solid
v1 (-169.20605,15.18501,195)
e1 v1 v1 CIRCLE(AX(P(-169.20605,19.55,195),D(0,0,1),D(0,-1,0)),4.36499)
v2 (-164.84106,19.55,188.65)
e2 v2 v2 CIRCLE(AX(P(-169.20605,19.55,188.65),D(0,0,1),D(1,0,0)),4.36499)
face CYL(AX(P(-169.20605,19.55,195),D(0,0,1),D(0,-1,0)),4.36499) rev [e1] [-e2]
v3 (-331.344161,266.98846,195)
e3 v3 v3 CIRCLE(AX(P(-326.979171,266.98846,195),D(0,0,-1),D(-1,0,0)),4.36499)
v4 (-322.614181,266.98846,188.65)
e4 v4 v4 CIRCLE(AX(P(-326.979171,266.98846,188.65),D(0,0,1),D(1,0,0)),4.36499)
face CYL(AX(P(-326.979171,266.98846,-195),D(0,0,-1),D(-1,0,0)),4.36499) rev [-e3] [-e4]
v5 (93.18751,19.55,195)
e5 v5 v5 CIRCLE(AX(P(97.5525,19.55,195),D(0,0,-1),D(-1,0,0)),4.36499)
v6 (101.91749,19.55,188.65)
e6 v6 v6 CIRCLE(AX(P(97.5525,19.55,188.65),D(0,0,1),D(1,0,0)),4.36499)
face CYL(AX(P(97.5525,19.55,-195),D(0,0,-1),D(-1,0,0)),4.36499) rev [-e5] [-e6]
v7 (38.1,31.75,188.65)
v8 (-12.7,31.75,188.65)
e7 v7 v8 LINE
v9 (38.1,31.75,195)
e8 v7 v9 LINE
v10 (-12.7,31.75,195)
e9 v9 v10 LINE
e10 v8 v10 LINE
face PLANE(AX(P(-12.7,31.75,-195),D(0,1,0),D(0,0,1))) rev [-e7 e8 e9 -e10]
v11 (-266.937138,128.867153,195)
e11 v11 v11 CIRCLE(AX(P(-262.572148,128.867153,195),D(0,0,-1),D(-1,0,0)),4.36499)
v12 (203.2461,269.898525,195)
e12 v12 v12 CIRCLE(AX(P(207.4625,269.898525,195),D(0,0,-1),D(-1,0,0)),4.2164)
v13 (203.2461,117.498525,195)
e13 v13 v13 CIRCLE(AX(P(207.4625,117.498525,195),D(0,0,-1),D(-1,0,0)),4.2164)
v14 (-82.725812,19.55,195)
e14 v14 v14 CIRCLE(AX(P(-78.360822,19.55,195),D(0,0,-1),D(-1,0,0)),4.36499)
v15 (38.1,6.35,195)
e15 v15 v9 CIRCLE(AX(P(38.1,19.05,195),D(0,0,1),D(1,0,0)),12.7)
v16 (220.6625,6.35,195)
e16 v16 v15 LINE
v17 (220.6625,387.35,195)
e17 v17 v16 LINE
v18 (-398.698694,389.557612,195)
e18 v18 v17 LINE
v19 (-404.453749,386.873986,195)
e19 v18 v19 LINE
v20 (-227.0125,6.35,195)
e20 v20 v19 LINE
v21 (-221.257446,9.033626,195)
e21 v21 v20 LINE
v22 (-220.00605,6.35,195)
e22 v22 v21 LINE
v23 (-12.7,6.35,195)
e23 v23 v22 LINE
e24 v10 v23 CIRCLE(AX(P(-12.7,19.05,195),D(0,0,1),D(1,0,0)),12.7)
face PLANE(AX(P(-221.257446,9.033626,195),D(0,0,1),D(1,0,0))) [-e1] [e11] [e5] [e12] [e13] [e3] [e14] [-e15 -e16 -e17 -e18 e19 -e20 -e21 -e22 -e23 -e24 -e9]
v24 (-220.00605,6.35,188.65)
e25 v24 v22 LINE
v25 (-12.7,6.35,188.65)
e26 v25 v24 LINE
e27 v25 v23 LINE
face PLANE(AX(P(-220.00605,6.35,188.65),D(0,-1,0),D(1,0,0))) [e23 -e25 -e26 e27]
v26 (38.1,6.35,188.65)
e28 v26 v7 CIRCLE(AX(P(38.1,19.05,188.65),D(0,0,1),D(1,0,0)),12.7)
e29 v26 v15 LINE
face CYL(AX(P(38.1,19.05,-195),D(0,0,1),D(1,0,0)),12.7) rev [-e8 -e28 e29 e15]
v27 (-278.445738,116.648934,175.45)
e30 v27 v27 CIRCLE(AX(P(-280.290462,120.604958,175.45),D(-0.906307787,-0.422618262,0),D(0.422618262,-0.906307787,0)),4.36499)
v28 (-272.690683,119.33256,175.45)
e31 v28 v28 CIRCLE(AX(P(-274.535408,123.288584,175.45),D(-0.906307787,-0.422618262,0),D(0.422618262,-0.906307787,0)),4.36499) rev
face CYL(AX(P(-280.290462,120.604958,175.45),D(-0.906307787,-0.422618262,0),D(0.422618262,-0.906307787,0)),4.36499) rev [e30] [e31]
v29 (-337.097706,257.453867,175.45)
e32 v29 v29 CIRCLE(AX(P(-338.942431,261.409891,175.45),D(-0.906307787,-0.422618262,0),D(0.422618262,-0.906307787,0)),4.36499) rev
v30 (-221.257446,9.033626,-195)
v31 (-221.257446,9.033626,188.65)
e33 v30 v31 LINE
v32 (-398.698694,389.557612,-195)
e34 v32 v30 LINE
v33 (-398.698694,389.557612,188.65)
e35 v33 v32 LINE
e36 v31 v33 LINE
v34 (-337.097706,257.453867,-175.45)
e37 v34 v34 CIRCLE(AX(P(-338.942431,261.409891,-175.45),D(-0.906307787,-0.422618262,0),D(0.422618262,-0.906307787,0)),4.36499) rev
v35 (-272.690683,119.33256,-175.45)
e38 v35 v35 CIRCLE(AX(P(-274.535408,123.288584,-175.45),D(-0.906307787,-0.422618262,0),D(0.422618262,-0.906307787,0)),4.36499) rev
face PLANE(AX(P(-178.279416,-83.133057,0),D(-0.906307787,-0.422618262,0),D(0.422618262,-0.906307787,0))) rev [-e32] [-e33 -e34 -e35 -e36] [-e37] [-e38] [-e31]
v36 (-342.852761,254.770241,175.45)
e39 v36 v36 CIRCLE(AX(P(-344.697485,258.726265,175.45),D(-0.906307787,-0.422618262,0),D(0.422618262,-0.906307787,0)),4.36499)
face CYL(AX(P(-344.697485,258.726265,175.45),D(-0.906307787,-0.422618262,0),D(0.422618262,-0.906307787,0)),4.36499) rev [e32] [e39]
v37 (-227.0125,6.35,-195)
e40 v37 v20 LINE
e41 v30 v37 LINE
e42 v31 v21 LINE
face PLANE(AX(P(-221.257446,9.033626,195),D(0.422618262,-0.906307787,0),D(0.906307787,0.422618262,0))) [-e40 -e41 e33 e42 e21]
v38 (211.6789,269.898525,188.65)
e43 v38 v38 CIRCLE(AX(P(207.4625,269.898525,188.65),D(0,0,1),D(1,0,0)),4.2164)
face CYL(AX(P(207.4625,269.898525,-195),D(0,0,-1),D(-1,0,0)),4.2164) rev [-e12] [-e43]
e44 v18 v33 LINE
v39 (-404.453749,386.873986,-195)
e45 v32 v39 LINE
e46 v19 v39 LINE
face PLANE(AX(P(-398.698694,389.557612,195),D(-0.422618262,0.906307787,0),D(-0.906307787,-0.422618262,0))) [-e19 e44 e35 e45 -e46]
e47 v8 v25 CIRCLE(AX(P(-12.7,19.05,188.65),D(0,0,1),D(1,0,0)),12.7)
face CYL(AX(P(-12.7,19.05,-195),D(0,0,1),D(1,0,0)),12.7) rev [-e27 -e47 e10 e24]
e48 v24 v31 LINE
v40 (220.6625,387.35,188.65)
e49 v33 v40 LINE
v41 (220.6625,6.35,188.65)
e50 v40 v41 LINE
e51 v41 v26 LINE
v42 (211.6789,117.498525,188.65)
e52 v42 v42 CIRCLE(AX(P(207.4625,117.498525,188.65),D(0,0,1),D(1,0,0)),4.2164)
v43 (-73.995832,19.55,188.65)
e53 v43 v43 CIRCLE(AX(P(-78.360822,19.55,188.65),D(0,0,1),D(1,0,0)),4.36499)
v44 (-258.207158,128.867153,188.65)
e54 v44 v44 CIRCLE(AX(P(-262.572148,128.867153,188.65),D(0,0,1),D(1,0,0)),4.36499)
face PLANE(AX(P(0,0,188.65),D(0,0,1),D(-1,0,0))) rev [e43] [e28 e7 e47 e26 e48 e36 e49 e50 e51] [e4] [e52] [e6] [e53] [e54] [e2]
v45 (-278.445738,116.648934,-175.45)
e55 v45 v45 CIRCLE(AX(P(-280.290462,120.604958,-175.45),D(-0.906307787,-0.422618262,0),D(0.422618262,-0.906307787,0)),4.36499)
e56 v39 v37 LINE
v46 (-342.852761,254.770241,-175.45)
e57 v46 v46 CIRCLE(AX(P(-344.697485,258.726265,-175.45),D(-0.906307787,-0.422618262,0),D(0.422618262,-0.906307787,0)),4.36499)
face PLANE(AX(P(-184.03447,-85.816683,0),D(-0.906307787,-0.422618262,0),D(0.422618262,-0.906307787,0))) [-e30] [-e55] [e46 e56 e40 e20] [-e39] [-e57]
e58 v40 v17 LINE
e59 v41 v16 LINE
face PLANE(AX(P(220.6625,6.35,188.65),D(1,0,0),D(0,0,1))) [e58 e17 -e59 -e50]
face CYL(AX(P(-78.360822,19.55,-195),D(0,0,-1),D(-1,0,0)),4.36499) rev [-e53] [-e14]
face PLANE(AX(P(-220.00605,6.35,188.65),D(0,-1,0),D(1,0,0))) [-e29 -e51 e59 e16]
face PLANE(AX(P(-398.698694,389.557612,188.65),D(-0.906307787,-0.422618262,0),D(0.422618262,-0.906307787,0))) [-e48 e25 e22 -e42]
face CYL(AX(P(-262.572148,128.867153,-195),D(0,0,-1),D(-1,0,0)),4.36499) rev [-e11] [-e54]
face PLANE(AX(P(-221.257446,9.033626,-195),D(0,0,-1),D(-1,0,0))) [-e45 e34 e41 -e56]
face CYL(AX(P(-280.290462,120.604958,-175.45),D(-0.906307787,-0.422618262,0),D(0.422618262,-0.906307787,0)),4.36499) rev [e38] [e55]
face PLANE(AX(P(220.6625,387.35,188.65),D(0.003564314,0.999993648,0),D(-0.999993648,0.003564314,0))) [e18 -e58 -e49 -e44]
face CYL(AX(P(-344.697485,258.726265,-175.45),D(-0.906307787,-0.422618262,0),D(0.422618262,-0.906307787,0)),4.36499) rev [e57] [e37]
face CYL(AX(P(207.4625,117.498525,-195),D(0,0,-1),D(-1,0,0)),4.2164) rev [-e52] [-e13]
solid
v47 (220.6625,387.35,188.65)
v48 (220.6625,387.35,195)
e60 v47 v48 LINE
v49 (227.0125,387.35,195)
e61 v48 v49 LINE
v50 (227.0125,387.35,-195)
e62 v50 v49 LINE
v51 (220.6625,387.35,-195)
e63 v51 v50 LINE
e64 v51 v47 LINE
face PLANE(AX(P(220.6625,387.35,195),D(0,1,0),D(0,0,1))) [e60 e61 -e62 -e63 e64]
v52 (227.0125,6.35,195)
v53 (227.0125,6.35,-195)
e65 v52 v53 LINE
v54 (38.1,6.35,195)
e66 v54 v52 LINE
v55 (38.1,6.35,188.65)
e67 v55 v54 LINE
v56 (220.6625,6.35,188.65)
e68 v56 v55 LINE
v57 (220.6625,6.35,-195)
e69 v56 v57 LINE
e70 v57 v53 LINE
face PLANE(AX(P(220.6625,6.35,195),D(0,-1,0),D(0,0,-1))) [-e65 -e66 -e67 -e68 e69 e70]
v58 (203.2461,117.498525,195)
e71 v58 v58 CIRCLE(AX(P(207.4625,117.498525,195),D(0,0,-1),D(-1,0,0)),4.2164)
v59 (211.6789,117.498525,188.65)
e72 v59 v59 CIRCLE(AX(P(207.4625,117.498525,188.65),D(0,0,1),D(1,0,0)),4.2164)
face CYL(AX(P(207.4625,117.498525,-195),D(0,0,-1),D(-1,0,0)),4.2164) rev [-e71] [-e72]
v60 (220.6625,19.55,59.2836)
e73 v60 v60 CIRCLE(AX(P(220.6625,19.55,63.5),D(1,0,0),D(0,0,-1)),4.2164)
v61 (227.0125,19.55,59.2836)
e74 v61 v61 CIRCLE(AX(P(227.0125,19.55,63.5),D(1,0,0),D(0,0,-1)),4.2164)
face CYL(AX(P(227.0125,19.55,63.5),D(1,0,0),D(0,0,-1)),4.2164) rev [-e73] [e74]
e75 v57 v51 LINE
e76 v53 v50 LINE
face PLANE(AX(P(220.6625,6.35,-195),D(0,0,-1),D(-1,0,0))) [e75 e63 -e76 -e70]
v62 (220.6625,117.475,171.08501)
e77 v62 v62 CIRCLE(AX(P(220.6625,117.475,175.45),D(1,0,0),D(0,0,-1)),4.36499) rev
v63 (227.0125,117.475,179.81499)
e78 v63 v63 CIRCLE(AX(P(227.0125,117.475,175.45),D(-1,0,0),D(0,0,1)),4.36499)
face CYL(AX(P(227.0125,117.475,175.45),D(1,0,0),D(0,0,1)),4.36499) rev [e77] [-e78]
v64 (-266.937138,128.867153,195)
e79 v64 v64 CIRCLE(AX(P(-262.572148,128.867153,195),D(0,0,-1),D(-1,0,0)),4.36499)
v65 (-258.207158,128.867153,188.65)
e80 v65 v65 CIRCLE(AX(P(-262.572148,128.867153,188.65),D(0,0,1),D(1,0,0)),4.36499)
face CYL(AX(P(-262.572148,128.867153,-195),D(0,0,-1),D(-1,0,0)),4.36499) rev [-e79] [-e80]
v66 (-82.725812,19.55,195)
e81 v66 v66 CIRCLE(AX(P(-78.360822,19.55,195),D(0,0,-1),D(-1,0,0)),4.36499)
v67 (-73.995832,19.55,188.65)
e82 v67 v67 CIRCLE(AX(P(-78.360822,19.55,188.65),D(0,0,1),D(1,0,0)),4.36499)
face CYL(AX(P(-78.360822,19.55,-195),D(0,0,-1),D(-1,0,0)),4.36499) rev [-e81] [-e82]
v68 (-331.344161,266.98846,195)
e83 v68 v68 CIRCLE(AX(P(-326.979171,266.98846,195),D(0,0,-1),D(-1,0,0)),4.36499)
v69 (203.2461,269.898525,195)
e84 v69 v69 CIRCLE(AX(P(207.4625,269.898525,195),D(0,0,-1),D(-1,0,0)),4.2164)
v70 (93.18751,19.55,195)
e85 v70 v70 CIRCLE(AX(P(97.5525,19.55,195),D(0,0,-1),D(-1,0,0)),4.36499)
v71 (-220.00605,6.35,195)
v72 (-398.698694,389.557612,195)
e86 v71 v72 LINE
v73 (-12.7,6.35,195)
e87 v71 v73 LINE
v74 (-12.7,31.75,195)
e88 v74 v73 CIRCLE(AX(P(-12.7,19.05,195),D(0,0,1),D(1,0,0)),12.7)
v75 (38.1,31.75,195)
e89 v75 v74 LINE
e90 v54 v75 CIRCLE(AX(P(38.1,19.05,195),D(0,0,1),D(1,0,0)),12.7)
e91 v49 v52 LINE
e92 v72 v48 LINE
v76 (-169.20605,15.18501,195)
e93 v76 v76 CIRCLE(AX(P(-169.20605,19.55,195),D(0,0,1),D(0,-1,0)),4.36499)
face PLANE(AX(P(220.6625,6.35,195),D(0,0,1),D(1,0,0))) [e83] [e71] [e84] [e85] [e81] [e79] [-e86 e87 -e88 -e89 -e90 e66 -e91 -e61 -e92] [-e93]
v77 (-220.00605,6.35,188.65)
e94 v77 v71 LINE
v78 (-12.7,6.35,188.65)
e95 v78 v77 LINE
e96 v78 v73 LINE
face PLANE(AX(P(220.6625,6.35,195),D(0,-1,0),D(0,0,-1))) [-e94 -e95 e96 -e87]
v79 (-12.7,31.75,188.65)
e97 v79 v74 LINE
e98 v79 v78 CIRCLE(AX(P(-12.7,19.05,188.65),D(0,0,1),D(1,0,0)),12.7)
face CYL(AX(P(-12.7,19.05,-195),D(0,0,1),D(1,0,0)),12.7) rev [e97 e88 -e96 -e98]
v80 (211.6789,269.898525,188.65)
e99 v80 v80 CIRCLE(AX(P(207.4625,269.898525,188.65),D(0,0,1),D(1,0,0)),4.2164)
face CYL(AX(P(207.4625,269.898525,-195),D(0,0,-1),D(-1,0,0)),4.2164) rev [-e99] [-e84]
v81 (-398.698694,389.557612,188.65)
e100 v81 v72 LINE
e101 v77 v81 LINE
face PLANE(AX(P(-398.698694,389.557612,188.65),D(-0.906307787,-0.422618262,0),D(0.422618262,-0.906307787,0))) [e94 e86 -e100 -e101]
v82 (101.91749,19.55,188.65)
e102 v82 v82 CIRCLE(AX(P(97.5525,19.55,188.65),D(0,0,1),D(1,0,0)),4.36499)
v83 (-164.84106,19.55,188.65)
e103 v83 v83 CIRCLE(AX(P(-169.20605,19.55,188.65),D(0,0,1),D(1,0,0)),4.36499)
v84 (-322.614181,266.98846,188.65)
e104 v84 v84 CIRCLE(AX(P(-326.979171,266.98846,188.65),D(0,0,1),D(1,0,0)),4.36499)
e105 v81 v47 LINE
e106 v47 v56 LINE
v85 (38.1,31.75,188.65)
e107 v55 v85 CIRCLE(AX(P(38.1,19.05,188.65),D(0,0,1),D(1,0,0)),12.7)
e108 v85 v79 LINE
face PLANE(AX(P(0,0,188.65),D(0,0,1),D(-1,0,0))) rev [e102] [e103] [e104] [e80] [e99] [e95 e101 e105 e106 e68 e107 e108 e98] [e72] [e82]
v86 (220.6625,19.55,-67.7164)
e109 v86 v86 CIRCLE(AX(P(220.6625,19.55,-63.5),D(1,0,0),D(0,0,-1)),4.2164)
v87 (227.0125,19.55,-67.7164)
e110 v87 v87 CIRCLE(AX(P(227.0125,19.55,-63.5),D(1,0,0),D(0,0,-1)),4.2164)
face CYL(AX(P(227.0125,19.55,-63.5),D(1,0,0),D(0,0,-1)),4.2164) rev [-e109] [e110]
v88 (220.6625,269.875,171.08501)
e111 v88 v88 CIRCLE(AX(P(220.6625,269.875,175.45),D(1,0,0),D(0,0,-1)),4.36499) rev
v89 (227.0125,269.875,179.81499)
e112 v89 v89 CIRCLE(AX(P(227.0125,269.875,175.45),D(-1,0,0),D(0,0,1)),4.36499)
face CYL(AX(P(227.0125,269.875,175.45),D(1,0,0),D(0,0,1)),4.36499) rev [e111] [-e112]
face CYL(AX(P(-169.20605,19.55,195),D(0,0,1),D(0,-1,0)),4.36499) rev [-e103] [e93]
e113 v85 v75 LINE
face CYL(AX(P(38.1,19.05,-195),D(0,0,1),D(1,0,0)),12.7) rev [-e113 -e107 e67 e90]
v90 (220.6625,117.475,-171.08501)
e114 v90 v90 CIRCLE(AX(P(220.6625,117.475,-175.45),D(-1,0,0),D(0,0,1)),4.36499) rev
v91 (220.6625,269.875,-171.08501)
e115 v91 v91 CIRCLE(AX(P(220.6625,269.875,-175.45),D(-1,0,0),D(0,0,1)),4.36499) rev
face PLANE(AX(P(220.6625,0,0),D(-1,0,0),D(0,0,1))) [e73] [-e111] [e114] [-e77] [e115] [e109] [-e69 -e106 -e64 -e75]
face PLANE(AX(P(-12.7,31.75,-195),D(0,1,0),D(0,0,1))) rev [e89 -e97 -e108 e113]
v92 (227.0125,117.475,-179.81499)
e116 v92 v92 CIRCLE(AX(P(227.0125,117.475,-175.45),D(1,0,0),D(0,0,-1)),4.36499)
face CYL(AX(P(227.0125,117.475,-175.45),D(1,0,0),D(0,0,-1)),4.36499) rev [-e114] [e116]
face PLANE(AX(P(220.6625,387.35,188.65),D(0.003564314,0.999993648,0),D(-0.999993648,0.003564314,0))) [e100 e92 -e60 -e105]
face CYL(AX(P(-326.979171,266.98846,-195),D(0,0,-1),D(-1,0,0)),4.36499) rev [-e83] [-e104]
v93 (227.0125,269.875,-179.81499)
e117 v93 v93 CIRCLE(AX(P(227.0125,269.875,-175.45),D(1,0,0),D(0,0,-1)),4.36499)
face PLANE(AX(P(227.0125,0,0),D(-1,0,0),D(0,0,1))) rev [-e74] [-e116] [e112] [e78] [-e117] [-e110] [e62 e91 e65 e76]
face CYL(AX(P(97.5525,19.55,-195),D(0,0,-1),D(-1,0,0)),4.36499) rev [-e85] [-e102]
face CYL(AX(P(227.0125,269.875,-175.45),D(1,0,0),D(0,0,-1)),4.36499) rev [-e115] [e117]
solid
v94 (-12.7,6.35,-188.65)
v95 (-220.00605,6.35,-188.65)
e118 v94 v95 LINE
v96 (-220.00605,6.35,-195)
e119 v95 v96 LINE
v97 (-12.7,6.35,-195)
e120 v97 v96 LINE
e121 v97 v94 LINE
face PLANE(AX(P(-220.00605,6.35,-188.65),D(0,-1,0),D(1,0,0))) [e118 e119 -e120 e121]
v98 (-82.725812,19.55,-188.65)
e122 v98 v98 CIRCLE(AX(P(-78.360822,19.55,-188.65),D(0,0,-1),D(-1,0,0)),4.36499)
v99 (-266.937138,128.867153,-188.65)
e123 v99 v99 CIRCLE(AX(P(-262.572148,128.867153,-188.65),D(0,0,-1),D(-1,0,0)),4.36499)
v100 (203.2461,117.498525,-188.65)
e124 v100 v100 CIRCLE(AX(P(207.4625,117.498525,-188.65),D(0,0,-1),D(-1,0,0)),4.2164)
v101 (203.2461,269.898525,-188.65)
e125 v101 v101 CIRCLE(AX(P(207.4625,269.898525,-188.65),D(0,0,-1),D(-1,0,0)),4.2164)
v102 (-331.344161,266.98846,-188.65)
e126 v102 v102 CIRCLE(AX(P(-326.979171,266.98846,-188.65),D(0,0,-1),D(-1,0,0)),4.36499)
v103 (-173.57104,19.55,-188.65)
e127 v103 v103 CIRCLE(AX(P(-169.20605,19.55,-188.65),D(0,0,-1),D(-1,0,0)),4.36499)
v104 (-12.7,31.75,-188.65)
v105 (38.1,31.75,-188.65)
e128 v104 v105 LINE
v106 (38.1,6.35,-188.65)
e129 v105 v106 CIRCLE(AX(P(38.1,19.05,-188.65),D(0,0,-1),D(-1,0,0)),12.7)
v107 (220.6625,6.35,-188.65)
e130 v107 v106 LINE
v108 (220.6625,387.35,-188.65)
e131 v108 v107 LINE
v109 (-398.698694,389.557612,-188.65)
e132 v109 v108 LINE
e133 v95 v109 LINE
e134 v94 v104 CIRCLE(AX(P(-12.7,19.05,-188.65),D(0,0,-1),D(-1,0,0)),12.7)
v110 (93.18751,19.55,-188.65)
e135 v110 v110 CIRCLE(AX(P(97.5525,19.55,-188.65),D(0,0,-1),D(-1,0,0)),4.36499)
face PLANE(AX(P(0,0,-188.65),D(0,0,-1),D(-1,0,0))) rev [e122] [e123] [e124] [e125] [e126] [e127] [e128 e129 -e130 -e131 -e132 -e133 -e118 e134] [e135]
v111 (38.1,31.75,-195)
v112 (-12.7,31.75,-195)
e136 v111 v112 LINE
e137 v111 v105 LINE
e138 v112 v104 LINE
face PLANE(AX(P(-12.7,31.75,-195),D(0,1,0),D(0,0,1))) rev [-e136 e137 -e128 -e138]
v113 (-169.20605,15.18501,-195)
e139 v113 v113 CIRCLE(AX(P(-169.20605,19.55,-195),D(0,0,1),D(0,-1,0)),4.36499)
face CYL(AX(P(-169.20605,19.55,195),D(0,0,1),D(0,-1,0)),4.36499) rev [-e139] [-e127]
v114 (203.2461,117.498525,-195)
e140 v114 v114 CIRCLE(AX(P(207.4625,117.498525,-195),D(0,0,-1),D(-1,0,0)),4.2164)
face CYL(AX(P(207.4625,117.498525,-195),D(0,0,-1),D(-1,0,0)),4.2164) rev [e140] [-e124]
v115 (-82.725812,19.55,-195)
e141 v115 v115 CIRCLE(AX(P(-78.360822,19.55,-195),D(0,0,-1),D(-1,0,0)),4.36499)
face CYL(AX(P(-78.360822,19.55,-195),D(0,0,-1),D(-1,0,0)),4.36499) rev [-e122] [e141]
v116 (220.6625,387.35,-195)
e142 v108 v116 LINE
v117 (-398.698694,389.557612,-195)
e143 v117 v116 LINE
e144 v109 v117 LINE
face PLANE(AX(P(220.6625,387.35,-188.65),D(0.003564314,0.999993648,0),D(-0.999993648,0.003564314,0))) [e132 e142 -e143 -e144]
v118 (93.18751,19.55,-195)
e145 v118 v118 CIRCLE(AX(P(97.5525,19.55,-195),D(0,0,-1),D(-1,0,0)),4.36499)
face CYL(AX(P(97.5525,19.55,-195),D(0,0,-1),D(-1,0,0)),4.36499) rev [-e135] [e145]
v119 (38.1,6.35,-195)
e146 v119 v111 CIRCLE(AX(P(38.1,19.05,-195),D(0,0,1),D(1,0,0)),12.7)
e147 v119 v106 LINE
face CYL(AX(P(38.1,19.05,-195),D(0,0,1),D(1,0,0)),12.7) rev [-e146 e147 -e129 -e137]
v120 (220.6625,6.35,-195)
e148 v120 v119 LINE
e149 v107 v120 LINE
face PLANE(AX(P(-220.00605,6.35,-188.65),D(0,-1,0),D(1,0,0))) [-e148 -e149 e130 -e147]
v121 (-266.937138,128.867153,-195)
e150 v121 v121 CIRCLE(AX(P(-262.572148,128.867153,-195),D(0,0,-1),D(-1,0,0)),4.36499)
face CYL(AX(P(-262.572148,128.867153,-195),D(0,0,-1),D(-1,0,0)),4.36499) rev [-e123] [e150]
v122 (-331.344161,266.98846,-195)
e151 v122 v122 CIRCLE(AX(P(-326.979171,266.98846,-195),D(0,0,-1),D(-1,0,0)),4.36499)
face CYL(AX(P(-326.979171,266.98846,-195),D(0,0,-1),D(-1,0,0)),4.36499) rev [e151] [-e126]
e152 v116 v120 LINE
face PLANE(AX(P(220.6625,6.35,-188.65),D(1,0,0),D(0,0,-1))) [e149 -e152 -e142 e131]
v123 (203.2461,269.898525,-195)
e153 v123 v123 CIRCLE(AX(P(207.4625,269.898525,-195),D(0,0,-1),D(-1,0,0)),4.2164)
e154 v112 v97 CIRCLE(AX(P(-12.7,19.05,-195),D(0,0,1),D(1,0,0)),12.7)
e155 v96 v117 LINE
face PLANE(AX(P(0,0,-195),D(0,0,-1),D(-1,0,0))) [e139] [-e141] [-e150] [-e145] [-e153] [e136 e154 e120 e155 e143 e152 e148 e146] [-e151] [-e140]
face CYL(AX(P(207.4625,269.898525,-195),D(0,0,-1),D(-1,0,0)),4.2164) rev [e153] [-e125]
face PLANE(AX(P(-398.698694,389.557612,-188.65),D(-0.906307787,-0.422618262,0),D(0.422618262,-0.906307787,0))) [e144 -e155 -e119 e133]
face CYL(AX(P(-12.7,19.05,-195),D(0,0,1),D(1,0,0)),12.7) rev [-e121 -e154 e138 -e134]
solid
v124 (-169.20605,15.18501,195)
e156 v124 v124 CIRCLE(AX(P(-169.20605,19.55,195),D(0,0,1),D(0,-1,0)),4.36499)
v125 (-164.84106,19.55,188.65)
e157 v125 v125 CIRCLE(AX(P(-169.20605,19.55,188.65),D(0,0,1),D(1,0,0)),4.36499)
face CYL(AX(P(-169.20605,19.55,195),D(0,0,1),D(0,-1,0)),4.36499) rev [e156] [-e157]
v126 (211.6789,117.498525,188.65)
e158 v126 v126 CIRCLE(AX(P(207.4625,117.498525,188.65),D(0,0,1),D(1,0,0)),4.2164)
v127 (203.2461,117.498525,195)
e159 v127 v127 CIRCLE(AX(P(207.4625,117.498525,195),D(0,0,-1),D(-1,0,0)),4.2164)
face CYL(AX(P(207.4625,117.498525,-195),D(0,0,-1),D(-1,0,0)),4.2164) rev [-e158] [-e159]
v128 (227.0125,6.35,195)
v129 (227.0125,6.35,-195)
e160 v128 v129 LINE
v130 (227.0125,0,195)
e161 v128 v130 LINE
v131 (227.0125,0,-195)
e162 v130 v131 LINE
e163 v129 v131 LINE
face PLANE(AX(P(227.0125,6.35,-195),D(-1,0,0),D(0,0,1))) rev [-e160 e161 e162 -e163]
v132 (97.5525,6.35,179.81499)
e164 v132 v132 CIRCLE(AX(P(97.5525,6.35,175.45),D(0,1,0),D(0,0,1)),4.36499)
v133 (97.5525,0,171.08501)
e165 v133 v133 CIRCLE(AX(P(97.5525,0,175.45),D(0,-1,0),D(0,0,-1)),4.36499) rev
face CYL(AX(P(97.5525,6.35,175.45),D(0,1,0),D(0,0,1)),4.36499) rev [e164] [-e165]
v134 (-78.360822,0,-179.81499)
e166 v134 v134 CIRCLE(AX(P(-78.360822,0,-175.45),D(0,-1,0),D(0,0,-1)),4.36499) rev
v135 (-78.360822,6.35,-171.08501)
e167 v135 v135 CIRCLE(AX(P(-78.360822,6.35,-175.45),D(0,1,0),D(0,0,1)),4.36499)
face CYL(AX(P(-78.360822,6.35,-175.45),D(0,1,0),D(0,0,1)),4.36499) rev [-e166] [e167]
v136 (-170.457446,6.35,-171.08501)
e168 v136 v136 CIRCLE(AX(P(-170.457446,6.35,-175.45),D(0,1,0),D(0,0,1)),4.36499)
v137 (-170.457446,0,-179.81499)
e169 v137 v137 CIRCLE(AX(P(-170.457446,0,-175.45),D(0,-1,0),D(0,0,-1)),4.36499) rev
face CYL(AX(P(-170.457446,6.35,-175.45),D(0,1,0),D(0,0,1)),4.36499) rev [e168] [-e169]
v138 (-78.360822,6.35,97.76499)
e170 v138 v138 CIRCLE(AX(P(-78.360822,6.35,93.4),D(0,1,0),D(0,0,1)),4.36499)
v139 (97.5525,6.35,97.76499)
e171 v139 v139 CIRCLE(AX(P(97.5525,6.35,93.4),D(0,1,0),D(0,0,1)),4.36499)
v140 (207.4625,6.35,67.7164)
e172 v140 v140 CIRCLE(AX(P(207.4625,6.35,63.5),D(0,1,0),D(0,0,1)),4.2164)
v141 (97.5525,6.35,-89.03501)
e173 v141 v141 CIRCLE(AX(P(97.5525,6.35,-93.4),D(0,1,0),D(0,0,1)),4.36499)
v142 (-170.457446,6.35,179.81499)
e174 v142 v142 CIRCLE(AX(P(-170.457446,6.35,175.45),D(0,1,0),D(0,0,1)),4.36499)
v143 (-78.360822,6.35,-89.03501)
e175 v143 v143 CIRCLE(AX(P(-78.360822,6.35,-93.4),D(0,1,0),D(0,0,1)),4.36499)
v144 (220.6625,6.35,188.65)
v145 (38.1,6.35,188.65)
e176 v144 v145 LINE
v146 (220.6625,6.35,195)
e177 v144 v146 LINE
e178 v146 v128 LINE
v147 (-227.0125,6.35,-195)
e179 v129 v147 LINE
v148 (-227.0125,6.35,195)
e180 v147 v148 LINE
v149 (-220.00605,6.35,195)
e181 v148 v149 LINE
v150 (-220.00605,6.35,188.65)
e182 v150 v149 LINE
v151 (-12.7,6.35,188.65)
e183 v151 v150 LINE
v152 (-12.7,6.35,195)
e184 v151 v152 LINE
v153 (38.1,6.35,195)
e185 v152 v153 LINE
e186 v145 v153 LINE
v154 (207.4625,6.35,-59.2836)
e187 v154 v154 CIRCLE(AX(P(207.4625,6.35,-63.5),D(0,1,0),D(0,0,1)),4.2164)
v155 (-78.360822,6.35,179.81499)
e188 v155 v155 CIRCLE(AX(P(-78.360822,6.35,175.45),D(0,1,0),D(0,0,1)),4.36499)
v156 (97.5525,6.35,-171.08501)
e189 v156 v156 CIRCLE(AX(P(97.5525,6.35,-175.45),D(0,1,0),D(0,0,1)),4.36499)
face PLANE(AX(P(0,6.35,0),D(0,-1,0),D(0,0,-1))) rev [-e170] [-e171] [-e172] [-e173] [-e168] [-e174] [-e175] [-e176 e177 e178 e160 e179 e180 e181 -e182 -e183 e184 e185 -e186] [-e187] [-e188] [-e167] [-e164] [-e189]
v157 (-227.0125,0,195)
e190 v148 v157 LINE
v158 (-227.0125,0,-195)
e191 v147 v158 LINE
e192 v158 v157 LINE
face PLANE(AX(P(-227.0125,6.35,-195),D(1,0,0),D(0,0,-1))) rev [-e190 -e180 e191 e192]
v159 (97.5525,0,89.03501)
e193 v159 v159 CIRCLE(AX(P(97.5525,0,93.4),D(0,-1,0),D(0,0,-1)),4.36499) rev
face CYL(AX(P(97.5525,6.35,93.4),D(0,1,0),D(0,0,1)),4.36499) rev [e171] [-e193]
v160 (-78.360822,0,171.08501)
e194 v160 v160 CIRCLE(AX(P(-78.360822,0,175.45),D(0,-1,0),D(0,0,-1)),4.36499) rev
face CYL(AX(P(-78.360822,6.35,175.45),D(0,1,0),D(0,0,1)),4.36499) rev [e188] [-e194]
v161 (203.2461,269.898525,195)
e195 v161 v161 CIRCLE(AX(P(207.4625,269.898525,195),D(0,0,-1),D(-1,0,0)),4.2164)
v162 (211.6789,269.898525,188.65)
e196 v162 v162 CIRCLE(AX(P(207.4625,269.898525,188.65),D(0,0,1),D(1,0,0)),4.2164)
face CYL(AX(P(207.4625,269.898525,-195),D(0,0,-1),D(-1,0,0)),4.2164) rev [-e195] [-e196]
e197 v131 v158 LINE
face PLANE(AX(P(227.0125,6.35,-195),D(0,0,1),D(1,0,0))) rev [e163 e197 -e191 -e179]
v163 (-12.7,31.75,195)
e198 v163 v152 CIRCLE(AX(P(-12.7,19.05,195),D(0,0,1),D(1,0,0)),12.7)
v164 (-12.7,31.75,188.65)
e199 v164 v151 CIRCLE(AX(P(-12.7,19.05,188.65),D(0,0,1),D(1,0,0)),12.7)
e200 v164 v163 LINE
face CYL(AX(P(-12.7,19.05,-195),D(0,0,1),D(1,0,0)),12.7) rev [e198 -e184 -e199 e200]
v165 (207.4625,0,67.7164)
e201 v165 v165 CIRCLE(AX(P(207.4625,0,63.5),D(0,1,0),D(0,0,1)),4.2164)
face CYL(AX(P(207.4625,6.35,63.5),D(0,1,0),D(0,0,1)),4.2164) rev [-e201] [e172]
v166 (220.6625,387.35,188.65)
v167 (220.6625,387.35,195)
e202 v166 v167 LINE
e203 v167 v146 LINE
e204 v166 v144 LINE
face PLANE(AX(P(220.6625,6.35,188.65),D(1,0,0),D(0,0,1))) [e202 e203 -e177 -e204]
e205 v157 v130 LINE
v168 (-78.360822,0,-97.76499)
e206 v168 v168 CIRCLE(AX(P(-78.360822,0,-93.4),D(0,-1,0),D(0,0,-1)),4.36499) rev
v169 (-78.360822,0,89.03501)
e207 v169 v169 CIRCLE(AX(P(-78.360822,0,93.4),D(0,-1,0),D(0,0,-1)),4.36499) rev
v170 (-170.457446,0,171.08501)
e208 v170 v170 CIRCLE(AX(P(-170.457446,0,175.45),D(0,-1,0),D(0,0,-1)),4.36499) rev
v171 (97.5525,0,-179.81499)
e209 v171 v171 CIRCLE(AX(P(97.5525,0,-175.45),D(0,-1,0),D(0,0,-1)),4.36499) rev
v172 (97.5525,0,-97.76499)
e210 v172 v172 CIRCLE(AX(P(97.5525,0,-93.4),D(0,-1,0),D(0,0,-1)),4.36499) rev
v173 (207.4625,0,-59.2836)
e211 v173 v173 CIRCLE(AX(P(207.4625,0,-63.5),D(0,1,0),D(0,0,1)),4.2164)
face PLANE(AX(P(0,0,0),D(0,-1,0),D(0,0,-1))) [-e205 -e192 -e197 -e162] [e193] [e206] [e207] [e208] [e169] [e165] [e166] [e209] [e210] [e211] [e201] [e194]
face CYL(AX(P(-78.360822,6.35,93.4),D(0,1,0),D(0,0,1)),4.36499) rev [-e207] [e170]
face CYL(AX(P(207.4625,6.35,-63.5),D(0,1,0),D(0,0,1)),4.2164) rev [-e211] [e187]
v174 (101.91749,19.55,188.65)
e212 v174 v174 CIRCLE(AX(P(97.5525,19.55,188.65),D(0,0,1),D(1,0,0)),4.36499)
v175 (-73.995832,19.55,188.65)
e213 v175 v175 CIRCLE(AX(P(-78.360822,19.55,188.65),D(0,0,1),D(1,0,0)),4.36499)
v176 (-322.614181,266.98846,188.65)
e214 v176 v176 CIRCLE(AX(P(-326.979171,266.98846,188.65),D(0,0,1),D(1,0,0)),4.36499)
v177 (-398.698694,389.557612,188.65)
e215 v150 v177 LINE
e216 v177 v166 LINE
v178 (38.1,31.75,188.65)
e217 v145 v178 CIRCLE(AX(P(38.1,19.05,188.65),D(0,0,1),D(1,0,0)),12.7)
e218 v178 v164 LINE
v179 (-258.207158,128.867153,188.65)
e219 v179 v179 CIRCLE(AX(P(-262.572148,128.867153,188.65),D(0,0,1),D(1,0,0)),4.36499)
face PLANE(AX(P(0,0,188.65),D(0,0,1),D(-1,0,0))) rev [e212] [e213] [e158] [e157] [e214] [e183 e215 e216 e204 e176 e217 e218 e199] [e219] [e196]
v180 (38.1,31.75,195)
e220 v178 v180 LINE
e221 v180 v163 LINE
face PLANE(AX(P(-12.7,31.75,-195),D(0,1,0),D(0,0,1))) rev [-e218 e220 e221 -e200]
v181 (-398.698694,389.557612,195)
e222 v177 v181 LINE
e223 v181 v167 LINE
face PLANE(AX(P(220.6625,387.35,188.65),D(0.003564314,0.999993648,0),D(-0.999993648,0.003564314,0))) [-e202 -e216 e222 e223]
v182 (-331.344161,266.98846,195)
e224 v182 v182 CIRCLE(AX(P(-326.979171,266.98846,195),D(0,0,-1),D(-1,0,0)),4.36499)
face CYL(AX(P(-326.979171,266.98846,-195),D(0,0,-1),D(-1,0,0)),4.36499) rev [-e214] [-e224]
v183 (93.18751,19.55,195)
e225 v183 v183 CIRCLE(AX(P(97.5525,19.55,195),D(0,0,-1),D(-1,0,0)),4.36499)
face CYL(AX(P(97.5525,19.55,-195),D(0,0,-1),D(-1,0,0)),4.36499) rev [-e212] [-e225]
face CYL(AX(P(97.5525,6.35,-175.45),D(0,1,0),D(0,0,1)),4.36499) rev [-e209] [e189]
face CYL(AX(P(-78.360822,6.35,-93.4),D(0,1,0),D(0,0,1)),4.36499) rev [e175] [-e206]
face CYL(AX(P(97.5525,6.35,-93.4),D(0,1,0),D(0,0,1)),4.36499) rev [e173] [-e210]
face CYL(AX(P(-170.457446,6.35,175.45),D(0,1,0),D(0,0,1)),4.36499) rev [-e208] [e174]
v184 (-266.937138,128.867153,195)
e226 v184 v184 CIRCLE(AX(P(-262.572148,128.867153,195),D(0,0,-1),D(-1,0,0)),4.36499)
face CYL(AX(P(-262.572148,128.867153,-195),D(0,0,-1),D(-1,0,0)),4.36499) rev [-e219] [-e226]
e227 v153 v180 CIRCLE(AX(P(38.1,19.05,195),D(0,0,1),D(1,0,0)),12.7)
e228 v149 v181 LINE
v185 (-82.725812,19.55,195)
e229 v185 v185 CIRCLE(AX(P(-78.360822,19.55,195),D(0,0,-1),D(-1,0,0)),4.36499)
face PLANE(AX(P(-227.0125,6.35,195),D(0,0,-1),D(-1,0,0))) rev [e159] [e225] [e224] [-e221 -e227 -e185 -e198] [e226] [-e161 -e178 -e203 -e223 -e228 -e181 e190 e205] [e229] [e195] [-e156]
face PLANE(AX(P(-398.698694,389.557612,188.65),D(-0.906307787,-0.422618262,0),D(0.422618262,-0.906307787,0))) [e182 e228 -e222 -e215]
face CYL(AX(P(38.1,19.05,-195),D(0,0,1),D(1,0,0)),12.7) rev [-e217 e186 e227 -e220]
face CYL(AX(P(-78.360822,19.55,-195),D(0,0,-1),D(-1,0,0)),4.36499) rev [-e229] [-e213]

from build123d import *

# Parameters (mm, degrees)
SKETCH2_W                          = 454.025
SKETCH2_H                          = 390
BOSS_EXTRUDE1_DEPTH                = 6.35
SKETCH8_W                          = 390
SKETCH8_H                          = 381
BOSS_EXTRUDE7_DEPTH                = 6.35
SKETCH15_W                         = 390
SKETCH15_H                         = 419.861763893
BOSS_EXTRUDE12_DEPTH               = 6.35
BOSS_EXTRUDE14_DEPTH               = 6.35
MIRROR13_START                     = 188.65
MIRROR13_DEPTH                     = 6.35
MIRROR13_2_DEPTH                   = 6.35
MIRROR13_3_DEPTH                   = 6.35
CUT_EXTRUDE3_DEPTH                 = 684.694352801
F_5_16_CLEARANCE_HOLE5_AT_2_COUNT  = 2
F_5_16_CLEARANCE_HOLE5_AT_2_PITCH  = 127
F_5_16_CLEARANCE_HOLE4_AT_2_COUNT  = 2
F_5_16_CLEARANCE_HOLE4_AT_2_PITCH  = 152.4
SKETCH55_W                         = 4.36499
SKETCH55_H                         = 390
F_5_16_CLEARANCE_HOLE3_AT_2_COUNT  = 2
F_5_16_CLEARANCE_HOLE3_AT_2_PITCH  = 175.91332244
SKETCH57_W                         = 4.2164
SKETCH57_H                         = 390
F_5_16_CLEARANCE_HOLE6_AT_2_COUNT  = 2
F_5_16_CLEARANCE_HOLE6_AT_2_PITCH  = 152.4
SKETCH59_W                         = 4.2164
SKETCH59_H                         = 6.35
F_5_16_CLEARANCE_HOLE7_AT_2_COUNT  = 2
F_5_16_CLEARANCE_HOLE7_AT_2_PITCH  = 127
SKETCH61_W                         = 4.36499
SKETCH61_H                         = 390
F_5_16_CLEARANCE_HOLE8_AT_2_COUNT  = 2
F_5_16_CLEARANCE_HOLE8_AT_2_PITCH  = 152.4
F_5_16_CLEARANCE_HOLE9_AT_2_COUNT  = 2
F_5_16_CLEARANCE_HOLE9_AT_2_PITCH  = 152.4
F_5_16_CLEARANCE_HOLE10_AT_2_COUNT = 2
F_5_16_CLEARANCE_HOLE10_AT_2_PITCH = 175.91332244
F_5_16_CLEARANCE_HOLE11_AT_2_COUNT = 2
F_5_16_CLEARANCE_HOLE11_AT_2_PITCH = 175.91332244
F_5_16_CLEARANCE_HOLE11_AT_3_COUNT = 2
F_5_16_CLEARANCE_HOLE11_AT_3_PITCH = 256.592550578
F_5_16_CLEARANCE_HOLE11_AT_4_COUNT = 2
F_5_16_CLEARANCE_HOLE11_AT_4_PITCH = 186.8
F_5_16_CLEARANCE_HOLE12_AT_2_COUNT = 2
F_5_16_CLEARANCE_HOLE12_AT_2_PITCH = 350.9
SKETCH72_W                         = 4.36499
SKETCH72_H                         = 390


with BuildPart() as part:
    # Sketch2 → Boss-Extrude1 (new body)
    with BuildSketch(Plane(origin=(0, 0, 0), x_dir=(1, 0, 0), z_dir=(0, 1, 0))):
        Rectangle(SKETCH2_W, SKETCH2_H)
    extrude(amount=BOSS_EXTRUDE1_DEPTH)

    # Mirror13 3 outline → Mirror13 3 (add)
    with BuildSketch(Plane.XY.offset(MIRROR13_START)):
        Polygon((-220.006050215, 6.35), (220.6625, 6.35), (220.6625, 387.35), (-398.69869438, 389.557612057), align=None)
    extrude(amount=MIRROR13_3_DEPTH)


with BuildPart() as body_2:
    # Sketch8 → Boss-Extrude7 (new body)
    with BuildSketch(Plane(origin=(227.0125, 0, 0), x_dir=(0, 0, -1), z_dir=(1, 0, 0))):
        with Locations((0, 196.85)):
            Rectangle(SKETCH8_W, SKETCH8_H)
    extrude(amount=-BOSS_EXTRUDE7_DEPTH)

    # Mirror13 2 outline → Mirror13 2 (add)
    with BuildSketch(Plane.XY.offset(MIRROR13_START)):
        Polygon((-220.006050215, 6.35), (220.6625, 6.35), (220.6625, 387.35), (-398.69869438, 389.557612057), align=None)
    extrude(amount=MIRROR13_2_DEPTH)


with BuildPart() as body_3:
    # Sketch15 → Boss-Extrude12 (new body)
    with BuildSketch(Plane(origin=(-184.034470015, -85.816682733, 0), x_dir=(0, 0, 1), z_dir=(-0.9063077870366526, -0.42261826174069383, 0))):
        with Locations((0, 311.625564538)):
            Rectangle(SKETCH15_W, SKETCH15_H)
    extrude(amount=-BOSS_EXTRUDE12_DEPTH)

    # Mirror13: read off the stored shape, not the designer's step
    # Mirror13 outline → Mirror13 (add)
    with BuildSketch(Plane.XY.offset(MIRROR13_START)):
        Polygon((-220.006050215, 6.35), (220.6625, 6.35), (220.6625, 387.35), (-398.69869438, 389.557612057), (-221.257445552, 9.033625962), align=None)
    extrude(amount=MIRROR13_DEPTH)


with BuildPart() as body_4:
    # Sketch48 → Boss-Extrude14 (new body)
    with BuildSketch(Plane(origin=(0, 0, -195), x_dir=(-1, 0, 0), z_dir=(0, 0, -1))):
        Polygon((-220.6625, 387.35), (398.69869438, 389.557612057), (220.006050215, 6.35), (-220.6625, 6.35), align=None)
    extrude(amount=-BOSS_EXTRUDE14_DEPTH)


with BuildPart() as cut_extrude3_tool:
    # Sketch49 → Cut-Extrude3 (new, through all)
    with BuildSketch(Plane.XY.offset(195)):
        with BuildLine():
            Line((-12.7, 31.75), (38.1, 31.75))
            ThreePointArc((38.1, 31.75), (50.8, 19.05), (38.1, 6.35))
            Line((38.1, 6.35), (-12.7, 6.35))
            ThreePointArc((-12.7, 6.35), (-25.4, 19.05), (-12.7, 31.75))
        make_face()
    extrude(amount=-CUT_EXTRUDE3_DEPTH)


with BuildPart() as part_1:
    add(part.part)

    # Cut-Extrude3: cut by cut_extrude3_tool
    add(cut_extrude3_tool.part, mode=Mode.SUBTRACT)


with BuildPart() as body_2_1:
    add(body_2.part)

    # Cut-Extrude3: cut by cut_extrude3_tool
    add(cut_extrude3_tool.part, mode=Mode.SUBTRACT)

    # Sketch23 → 5/16 Clearance Hole5 (revolve, cut)
    with BuildSketch(Plane(origin=(227.0125, 19.55, 63.5), x_dir=(0, 0, -1), z_dir=(0, 1, 0))):
        Polygon((0, 0), (0, 8.883468714), (4.2164, 6.35), (4.2164, 0), align=None)
    f_5_16_clearance_hole5 = revolve(axis=Axis((233.3625, 19.55, 63.5), (-1, 0, 0)), mode=Mode.SUBTRACT)

    # 5/16 Clearance Hole5 at 2: 5/16 Clearance Hole5 ×2
    with Locations(*[(0, 0, -i * F_5_16_CLEARANCE_HOLE5_AT_2_PITCH) for i in range(1, F_5_16_CLEARANCE_HOLE5_AT_2_COUNT)]):
        add(f_5_16_clearance_hole5, mode=Mode.SUBTRACT)

    # Sketch33 → 5/16 Clearance Hole4 (revolve, cut)
    with BuildSketch(Plane(origin=(227.0125, 269.875, -175.45), x_dir=(0, 0, -1), z_dir=(0, 1, 0))):
        Polygon((0, 0), (0, 8.972750593), (4.36499, 6.35), (4.36499, 0), align=None)
    f_5_16_clearance_hole4 = revolve(axis=Axis((233.3625, 269.875, -175.45), (-1, 0, 0)), mode=Mode.SUBTRACT)

    # 5/16 Clearance Hole4 at 2: 5/16 Clearance Hole4 ×2
    with Locations(*[(0, -i * F_5_16_CLEARANCE_HOLE4_AT_2_PITCH, 0) for i in range(1, F_5_16_CLEARANCE_HOLE4_AT_2_COUNT)]):
        add(f_5_16_clearance_hole4, mode=Mode.SUBTRACT)

    # Mirror2: 5/16 Clearance Hole4 across plane
    add(f_5_16_clearance_hole4.mirror(Plane.XY), mode=Mode.SUBTRACT)

    # Mirror2 copy 1 sketch → Mirror2 copy 1 (revolve, cut)
    with BuildSketch(Plane(origin=(227.0125, 117.475, 175.45), x_dir=(0, 0, 1), z_dir=(0, 1, 0))):
        Polygon((0, 0), (0, -8.972750593), (4.36499, -6.35), (4.36499, 0), align=None)
    revolve(axis=Axis((233.3625, 117.475, 175.45), (1, 0, 0)), mode=Mode.SUBTRACT)


with BuildPart() as body_3_1:
    add(body_3.part)

    # Cut-Extrude3: cut by cut_extrude3_tool
    add(cut_extrude3_tool.part, mode=Mode.SUBTRACT)


with BuildPart() as body_4_1:
    add(body_4.part)

    # Cut-Extrude3: cut by cut_extrude3_tool
    add(cut_extrude3_tool.part, mode=Mode.SUBTRACT)


with BuildPart() as f_5_16_clearance_hole3_tool:
    # Sketch55 → 5/16 Clearance Hole3 (revolve)
    with BuildSketch(Plane(origin=(97.5525, 19.55, -195), x_dir=(0, 1, 0), z_dir=(1, 0, 0))):
        with Locations((2.182495, 195)):
            Rectangle(SKETCH55_W, SKETCH55_H)
    f_5_16_clearance_hole3 = revolve(axis=Axis((97.5525, 19.55, -201.35), (0, 0, 1)))


with BuildPart() as part_2:
    add(part_1.part)

    # 5/16 Clearance Hole3: cut by f_5_16_clearance_hole3_tool
    add(f_5_16_clearance_hole3_tool.part, mode=Mode.SUBTRACT)


with BuildPart() as body_2_2:
    add(body_2_1.part)

    # 5/16 Clearance Hole3: cut by f_5_16_clearance_hole3_tool
    add(f_5_16_clearance_hole3_tool.part, mode=Mode.SUBTRACT)


with BuildPart() as body_3_2:
    add(body_3_1.part)

    # 5/16 Clearance Hole3: cut by f_5_16_clearance_hole3_tool
    add(f_5_16_clearance_hole3_tool.part, mode=Mode.SUBTRACT)


with BuildPart() as body_4_2:
    add(body_4_1.part)

    # 5/16 Clearance Hole3: cut by f_5_16_clearance_hole3_tool
    add(f_5_16_clearance_hole3_tool.part, mode=Mode.SUBTRACT)


with BuildPart() as f_5_16_clearance_hole3_at_2_tool:
    # 5/16 Clearance Hole3 at 2: 5/16 Clearance Hole3 ×2
    with Locations(*[(-i * F_5_16_CLEARANCE_HOLE3_AT_2_PITCH, 0, 0) for i in range(1, F_5_16_CLEARANCE_HOLE3_AT_2_COUNT)]):
        add(f_5_16_clearance_hole3)


with BuildPart() as part_3:
    add(part_2.part)

    # 5/16 Clearance Hole3 at 2: cut by f_5_16_clearance_hole3_at_2_tool
    add(f_5_16_clearance_hole3_at_2_tool.part, mode=Mode.SUBTRACT)


with BuildPart() as body_2_3:
    add(body_2_2.part)

    # 5/16 Clearance Hole3 at 2: cut by f_5_16_clearance_hole3_at_2_tool
    add(f_5_16_clearance_hole3_at_2_tool.part, mode=Mode.SUBTRACT)


with BuildPart() as body_3_3:
    add(body_3_2.part)

    # 5/16 Clearance Hole3 at 2: cut by f_5_16_clearance_hole3_at_2_tool
    add(f_5_16_clearance_hole3_at_2_tool.part, mode=Mode.SUBTRACT)


with BuildPart() as body_4_3:
    add(body_4_2.part)

    # 5/16 Clearance Hole3 at 2: cut by f_5_16_clearance_hole3_at_2_tool
    add(f_5_16_clearance_hole3_at_2_tool.part, mode=Mode.SUBTRACT)


with BuildPart() as f_5_16_clearance_hole6_tool:
    # Sketch57 → 5/16 Clearance Hole6 (revolve)
    with BuildSketch(Plane(origin=(207.4625, 269.898524625, -195), x_dir=(0, 1, 0), z_dir=(1, 0, 0))):
        with Locations((2.1082, 195)):
            Rectangle(SKETCH57_W, SKETCH57_H)
    f_5_16_clearance_hole6 = revolve(axis=Axis((207.4625, 269.898524625, -201.35), (0, 0, 1)))


with BuildPart() as part_4:
    add(part_3.part)

    # 5/16 Clearance Hole6: cut by f_5_16_clearance_hole6_tool
    add(f_5_16_clearance_hole6_tool.part, mode=Mode.SUBTRACT)


with BuildPart() as body_2_4:
    add(body_2_3.part)

    # 5/16 Clearance Hole6: cut by f_5_16_clearance_hole6_tool
    add(f_5_16_clearance_hole6_tool.part, mode=Mode.SUBTRACT)


with BuildPart() as body_3_4:
    add(body_3_3.part)

    # 5/16 Clearance Hole6: cut by f_5_16_clearance_hole6_tool
    add(f_5_16_clearance_hole6_tool.part, mode=Mode.SUBTRACT)


with BuildPart() as body_4_4:
    add(body_4_3.part)

    # 5/16 Clearance Hole6: cut by f_5_16_clearance_hole6_tool
    add(f_5_16_clearance_hole6_tool.part, mode=Mode.SUBTRACT)


with BuildPart() as f_5_16_clearance_hole6_at_2_tool:
    # 5/16 Clearance Hole6 at 2: 5/16 Clearance Hole6 ×2
    with Locations(*[(0, -i * F_5_16_CLEARANCE_HOLE6_AT_2_PITCH, 0) for i in range(1, F_5_16_CLEARANCE_HOLE6_AT_2_COUNT)]):
        add(f_5_16_clearance_hole6)


with BuildPart() as part_5:
    add(part_4.part)

    # 5/16 Clearance Hole6 at 2: cut by f_5_16_clearance_hole6_at_2_tool
    add(f_5_16_clearance_hole6_at_2_tool.part, mode=Mode.SUBTRACT)

    # Sketch59 → 5/16 Clearance Hole7 (revolve, cut)
    with BuildSketch(Plane(origin=(207.4625, 6.35, -63.5), x_dir=(0, 0, 1), z_dir=(1, 0, 0))):
        with Locations((2.1082, 3.175)):
            Rectangle(SKETCH59_W, SKETCH59_H)
    f_5_16_clearance_hole7 = revolve(axis=Axis((207.4625, 12.7, -63.5), (0, -1, 0)), mode=Mode.SUBTRACT)

    # 5/16 Clearance Hole7 at 2: 5/16 Clearance Hole7 ×2
    with Locations(*[(0, 0, i * F_5_16_CLEARANCE_HOLE7_AT_2_PITCH) for i in range(1, F_5_16_CLEARANCE_HOLE7_AT_2_COUNT)]):
        add(f_5_16_clearance_hole7, mode=Mode.SUBTRACT)


with BuildPart() as body_2_5:
    add(body_2_4.part)

    # 5/16 Clearance Hole6 at 2: cut by f_5_16_clearance_hole6_at_2_tool
    add(f_5_16_clearance_hole6_at_2_tool.part, mode=Mode.SUBTRACT)


with BuildPart() as body_3_5:
    add(body_3_4.part)

    # 5/16 Clearance Hole6 at 2: cut by f_5_16_clearance_hole6_at_2_tool
    add(f_5_16_clearance_hole6_at_2_tool.part, mode=Mode.SUBTRACT)


with BuildPart() as body_4_5:
    add(body_4_4.part)

    # 5/16 Clearance Hole6 at 2: cut by f_5_16_clearance_hole6_at_2_tool
    add(f_5_16_clearance_hole6_at_2_tool.part, mode=Mode.SUBTRACT)


with BuildPart() as f_5_16_clearance_hole8_tool:
    # Sketch61 → 5/16 Clearance Hole8 (revolve)
    with BuildSketch(Plane(origin=(-326.979171422, 266.988459636, -195), x_dir=(0, 1, 0), z_dir=(1, 0, 0))):
        with Locations((2.182495, 195)):
            Rectangle(SKETCH61_W, SKETCH61_H)
    f_5_16_clearance_hole8 = revolve(axis=Axis((-326.979171422, 266.988459636, -201.35), (0, 0, 1)))


with BuildPart() as part_6:
    add(part_5.part)

    # 5/16 Clearance Hole8: cut by f_5_16_clearance_hole8_tool
    add(f_5_16_clearance_hole8_tool.part, mode=Mode.SUBTRACT)


with BuildPart() as body_2_6:
    add(body_2_5.part)

    # 5/16 Clearance Hole8: cut by f_5_16_clearance_hole8_tool
    add(f_5_16_clearance_hole8_tool.part, mode=Mode.SUBTRACT)


with BuildPart() as body_3_6:
    add(body_3_5.part)

    # 5/16 Clearance Hole8: cut by f_5_16_clearance_hole8_tool
    add(f_5_16_clearance_hole8_tool.part, mode=Mode.SUBTRACT)


with BuildPart() as body_4_6:
    add(body_4_5.part)

    # 5/16 Clearance Hole8: cut by f_5_16_clearance_hole8_tool
    add(f_5_16_clearance_hole8_tool.part, mode=Mode.SUBTRACT)


with BuildPart() as f_5_16_clearance_hole8_at_2_tool:
    # 5/16 Clearance Hole8 at 2: 5/16 Clearance Hole8 ×2
    with Locations(*[Vector(0.42261826174069383, -0.9063077870366526, 0) * (i * F_5_16_CLEARANCE_HOLE8_AT_2_PITCH) for i in range(1, F_5_16_CLEARANCE_HOLE8_AT_2_COUNT)]):
        add(f_5_16_clearance_hole8)


with BuildPart() as part_7:
    add(part_6.part)

    # 5/16 Clearance Hole8 at 2: cut by f_5_16_clearance_hole8_at_2_tool
    add(f_5_16_clearance_hole8_at_2_tool.part, mode=Mode.SUBTRACT)

    # Sketch65 → 5/16 Clearance Hole10 (revolve, cut)
    with BuildSketch(Plane(origin=(97.5525, 6.35, -175.45), x_dir=(0, 0, 1), z_dir=(1, 0, 0))):
        Polygon((0, 0), (0, 8.972750593), (4.36499, 6.35), (4.36499, 0), align=None)
    f_5_16_clearance_hole10 = revolve(axis=Axis((97.5525, 12.7, -175.45), (0, -1, 0)), mode=Mode.SUBTRACT)

    # 5/16 Clearance Hole10 at 2: 5/16 Clearance Hole10 ×2
    with Locations(*[(-i * F_5_16_CLEARANCE_HOLE10_AT_2_PITCH, 0, 0) for i in range(1, F_5_16_CLEARANCE_HOLE10_AT_2_COUNT)]):
        add(f_5_16_clearance_hole10, mode=Mode.SUBTRACT)

    # Mirror16: 5/16 Clearance Hole10 across plane
    add(f_5_16_clearance_hole10.mirror(Plane.XY), mode=Mode.SUBTRACT)

    # Mirror16 copy 1 sketch → Mirror16 copy 1 (revolve, cut)
    with BuildSketch(Plane(origin=(-78.36082244, 6.35, 175.45), x_dir=(0, 0, -1), z_dir=(1, 0, 0))):
        Polygon((0, 0), (0, -8.972750593), (4.36499, -6.35), (4.36499, 0), align=None)
    revolve(axis=Axis((-78.36082244, 12.7, 175.45), (0, 1, 0)), mode=Mode.SUBTRACT)

    # Sketch67 → 5/16 Clearance Hole11 (revolve, cut)
    with BuildSketch(Plane(origin=(-78.36082244, 6.35, -93.4), x_dir=(0, 0, 1), z_dir=(1, 0, 0))):
        Polygon((0, 0), (0, 8.972750593), (4.36499, 6.35), (4.36499, 0), align=None)
    f_5_16_clearance_hole11 = revolve(axis=Axis((-78.36082244, 12.7, -93.4), (0, -1, 0)), mode=Mode.SUBTRACT)

    # 5/16 Clearance Hole11 at 2: 5/16 Clearance Hole11 ×2
    with Locations(*[(i * F_5_16_CLEARANCE_HOLE11_AT_2_PITCH, 0, 0) for i in range(1, F_5_16_CLEARANCE_HOLE11_AT_2_COUNT)]):
        add(f_5_16_clearance_hole11, mode=Mode.SUBTRACT)

    # 5/16 Clearance Hole11 at 3: 5/16 Clearance Hole11 ×2
    with Locations(*[Vector(0.6855745501732765, 0, 0.7280024286736341) * (i * F_5_16_CLEARANCE_HOLE11_AT_3_PITCH) for i in range(1, F_5_16_CLEARANCE_HOLE11_AT_3_COUNT)]):
        add(f_5_16_clearance_hole11, mode=Mode.SUBTRACT)

    # 5/16 Clearance Hole11 at 4: 5/16 Clearance Hole11 ×2
    with Locations(*[(0, 0, i * F_5_16_CLEARANCE_HOLE11_AT_4_PITCH) for i in range(1, F_5_16_CLEARANCE_HOLE11_AT_4_COUNT)]):
        add(f_5_16_clearance_hole11, mode=Mode.SUBTRACT)

    # Sketch69 → 5/16 Clearance Hole12 (revolve, cut)
    with BuildSketch(Plane(origin=(-170.457445552, 6.35, -175.45), x_dir=(0, 0, 1), z_dir=(1, 0, 0))):
        Polygon((0, 0), (0, 8.972750593), (4.36499, 6.35), (4.36499, 0), align=None)
    f_5_16_clearance_hole12 = revolve(axis=Axis((-170.457445552, 12.7, -175.45), (0, -1, 0)), mode=Mode.SUBTRACT)

    # 5/16 Clearance Hole12 at 2: 5/16 Clearance Hole12 ×2
    with Locations(*[(0, 0, i * F_5_16_CLEARANCE_HOLE12_AT_2_PITCH) for i in range(1, F_5_16_CLEARANCE_HOLE12_AT_2_COUNT)]):
        add(f_5_16_clearance_hole12, mode=Mode.SUBTRACT)


with BuildPart() as body_2_7:
    add(body_2_6.part)

    # 5/16 Clearance Hole8 at 2: cut by f_5_16_clearance_hole8_at_2_tool
    add(f_5_16_clearance_hole8_at_2_tool.part, mode=Mode.SUBTRACT)


with BuildPart() as body_3_7:
    add(body_3_6.part)

    # 5/16 Clearance Hole8 at 2: cut by f_5_16_clearance_hole8_at_2_tool
    add(f_5_16_clearance_hole8_at_2_tool.part, mode=Mode.SUBTRACT)

    # Sketch64 → 5/16 Clearance Hole9 (revolve, cut)
    with BuildSketch(Plane(origin=(-344.69748515, 258.726265095, -175.45), x_dir=(0.42261826174069383, -0.9063077870366527, 0), z_dir=(0, 0, 1))):
        Polygon((0, 0), (0, 8.972750593), (4.36499, 6.35), (4.36499, 0), align=None)
    f_5_16_clearance_hole9 = revolve(axis=Axis((-350.452539598, 256.042639133, -175.45), (0.9063077870366527, 0.42261826174069356, 0)), mode=Mode.SUBTRACT)

    # 5/16 Clearance Hole9 at 2: 5/16 Clearance Hole9 ×2
    with Locations(*[Vector(0.4226182617406935, -0.9063077870366527, 0) * (i * F_5_16_CLEARANCE_HOLE9_AT_2_PITCH) for i in range(1, F_5_16_CLEARANCE_HOLE9_AT_2_COUNT)]):
        add(f_5_16_clearance_hole9, mode=Mode.SUBTRACT)

    # Mirror15: 5/16 Clearance Hole9 across plane
    add(f_5_16_clearance_hole9.mirror(Plane.XY), mode=Mode.SUBTRACT)

    # Mirror15 copy 1 sketch → Mirror15 copy 1 (revolve, cut)
    with BuildSketch(Plane(origin=(-280.290462061, 120.604958351, 175.45), x_dir=(0.42261826174069383, -0.9063077870366527, 0), z_dir=(0, 0, -1))):
        Polygon((0, 0), (0, -8.972750593), (4.36499, -6.35), (4.36499, 0), align=None)
    revolve(axis=Axis((-286.045516509, 117.921332389, 175.45), (-0.9063077870366527, -0.42261826174069356, 0)), mode=Mode.SUBTRACT)


with BuildPart() as body_4_7:
    add(body_4_6.part)

    # 5/16 Clearance Hole8 at 2: cut by f_5_16_clearance_hole8_at_2_tool
    add(f_5_16_clearance_hole8_at_2_tool.part, mode=Mode.SUBTRACT)


with BuildPart() as f_5_16_clearance_hole13_tool:
    # Sketch72 → 5/16 Clearance Hole13 (revolve)
    with BuildSketch(Plane(origin=(-169.206050215, 19.55, 195), x_dir=(0, -1, 0), z_dir=(1, 0, 0))):
        with Locations((2.182495, 195)):
            Rectangle(SKETCH72_W, SKETCH72_H)
    revolve(axis=Axis((-169.206050215, 19.55, 201.35), (0, 0, -1)))


with BuildPart() as part_8:
    add(part_7.part)

    # 5/16 Clearance Hole13: cut by f_5_16_clearance_hole13_tool
    add(f_5_16_clearance_hole13_tool.part, mode=Mode.SUBTRACT)


with BuildPart() as body_2_8:
    add(body_2_7.part)

    # 5/16 Clearance Hole13: cut by f_5_16_clearance_hole13_tool
    add(f_5_16_clearance_hole13_tool.part, mode=Mode.SUBTRACT)


with BuildPart() as body_3_8:
    add(body_3_7.part)

    # 5/16 Clearance Hole13: cut by f_5_16_clearance_hole13_tool
    add(f_5_16_clearance_hole13_tool.part, mode=Mode.SUBTRACT)


with BuildPart() as body_4_8:
    add(body_4_7.part)

    # 5/16 Clearance Hole13: cut by f_5_16_clearance_hole13_tool
    add(f_5_16_clearance_hole13_tool.part, mode=Mode.SUBTRACT)


solid = Compound([part_8.part, body_2_8.part, body_3_8.part, body_4_8.part])
